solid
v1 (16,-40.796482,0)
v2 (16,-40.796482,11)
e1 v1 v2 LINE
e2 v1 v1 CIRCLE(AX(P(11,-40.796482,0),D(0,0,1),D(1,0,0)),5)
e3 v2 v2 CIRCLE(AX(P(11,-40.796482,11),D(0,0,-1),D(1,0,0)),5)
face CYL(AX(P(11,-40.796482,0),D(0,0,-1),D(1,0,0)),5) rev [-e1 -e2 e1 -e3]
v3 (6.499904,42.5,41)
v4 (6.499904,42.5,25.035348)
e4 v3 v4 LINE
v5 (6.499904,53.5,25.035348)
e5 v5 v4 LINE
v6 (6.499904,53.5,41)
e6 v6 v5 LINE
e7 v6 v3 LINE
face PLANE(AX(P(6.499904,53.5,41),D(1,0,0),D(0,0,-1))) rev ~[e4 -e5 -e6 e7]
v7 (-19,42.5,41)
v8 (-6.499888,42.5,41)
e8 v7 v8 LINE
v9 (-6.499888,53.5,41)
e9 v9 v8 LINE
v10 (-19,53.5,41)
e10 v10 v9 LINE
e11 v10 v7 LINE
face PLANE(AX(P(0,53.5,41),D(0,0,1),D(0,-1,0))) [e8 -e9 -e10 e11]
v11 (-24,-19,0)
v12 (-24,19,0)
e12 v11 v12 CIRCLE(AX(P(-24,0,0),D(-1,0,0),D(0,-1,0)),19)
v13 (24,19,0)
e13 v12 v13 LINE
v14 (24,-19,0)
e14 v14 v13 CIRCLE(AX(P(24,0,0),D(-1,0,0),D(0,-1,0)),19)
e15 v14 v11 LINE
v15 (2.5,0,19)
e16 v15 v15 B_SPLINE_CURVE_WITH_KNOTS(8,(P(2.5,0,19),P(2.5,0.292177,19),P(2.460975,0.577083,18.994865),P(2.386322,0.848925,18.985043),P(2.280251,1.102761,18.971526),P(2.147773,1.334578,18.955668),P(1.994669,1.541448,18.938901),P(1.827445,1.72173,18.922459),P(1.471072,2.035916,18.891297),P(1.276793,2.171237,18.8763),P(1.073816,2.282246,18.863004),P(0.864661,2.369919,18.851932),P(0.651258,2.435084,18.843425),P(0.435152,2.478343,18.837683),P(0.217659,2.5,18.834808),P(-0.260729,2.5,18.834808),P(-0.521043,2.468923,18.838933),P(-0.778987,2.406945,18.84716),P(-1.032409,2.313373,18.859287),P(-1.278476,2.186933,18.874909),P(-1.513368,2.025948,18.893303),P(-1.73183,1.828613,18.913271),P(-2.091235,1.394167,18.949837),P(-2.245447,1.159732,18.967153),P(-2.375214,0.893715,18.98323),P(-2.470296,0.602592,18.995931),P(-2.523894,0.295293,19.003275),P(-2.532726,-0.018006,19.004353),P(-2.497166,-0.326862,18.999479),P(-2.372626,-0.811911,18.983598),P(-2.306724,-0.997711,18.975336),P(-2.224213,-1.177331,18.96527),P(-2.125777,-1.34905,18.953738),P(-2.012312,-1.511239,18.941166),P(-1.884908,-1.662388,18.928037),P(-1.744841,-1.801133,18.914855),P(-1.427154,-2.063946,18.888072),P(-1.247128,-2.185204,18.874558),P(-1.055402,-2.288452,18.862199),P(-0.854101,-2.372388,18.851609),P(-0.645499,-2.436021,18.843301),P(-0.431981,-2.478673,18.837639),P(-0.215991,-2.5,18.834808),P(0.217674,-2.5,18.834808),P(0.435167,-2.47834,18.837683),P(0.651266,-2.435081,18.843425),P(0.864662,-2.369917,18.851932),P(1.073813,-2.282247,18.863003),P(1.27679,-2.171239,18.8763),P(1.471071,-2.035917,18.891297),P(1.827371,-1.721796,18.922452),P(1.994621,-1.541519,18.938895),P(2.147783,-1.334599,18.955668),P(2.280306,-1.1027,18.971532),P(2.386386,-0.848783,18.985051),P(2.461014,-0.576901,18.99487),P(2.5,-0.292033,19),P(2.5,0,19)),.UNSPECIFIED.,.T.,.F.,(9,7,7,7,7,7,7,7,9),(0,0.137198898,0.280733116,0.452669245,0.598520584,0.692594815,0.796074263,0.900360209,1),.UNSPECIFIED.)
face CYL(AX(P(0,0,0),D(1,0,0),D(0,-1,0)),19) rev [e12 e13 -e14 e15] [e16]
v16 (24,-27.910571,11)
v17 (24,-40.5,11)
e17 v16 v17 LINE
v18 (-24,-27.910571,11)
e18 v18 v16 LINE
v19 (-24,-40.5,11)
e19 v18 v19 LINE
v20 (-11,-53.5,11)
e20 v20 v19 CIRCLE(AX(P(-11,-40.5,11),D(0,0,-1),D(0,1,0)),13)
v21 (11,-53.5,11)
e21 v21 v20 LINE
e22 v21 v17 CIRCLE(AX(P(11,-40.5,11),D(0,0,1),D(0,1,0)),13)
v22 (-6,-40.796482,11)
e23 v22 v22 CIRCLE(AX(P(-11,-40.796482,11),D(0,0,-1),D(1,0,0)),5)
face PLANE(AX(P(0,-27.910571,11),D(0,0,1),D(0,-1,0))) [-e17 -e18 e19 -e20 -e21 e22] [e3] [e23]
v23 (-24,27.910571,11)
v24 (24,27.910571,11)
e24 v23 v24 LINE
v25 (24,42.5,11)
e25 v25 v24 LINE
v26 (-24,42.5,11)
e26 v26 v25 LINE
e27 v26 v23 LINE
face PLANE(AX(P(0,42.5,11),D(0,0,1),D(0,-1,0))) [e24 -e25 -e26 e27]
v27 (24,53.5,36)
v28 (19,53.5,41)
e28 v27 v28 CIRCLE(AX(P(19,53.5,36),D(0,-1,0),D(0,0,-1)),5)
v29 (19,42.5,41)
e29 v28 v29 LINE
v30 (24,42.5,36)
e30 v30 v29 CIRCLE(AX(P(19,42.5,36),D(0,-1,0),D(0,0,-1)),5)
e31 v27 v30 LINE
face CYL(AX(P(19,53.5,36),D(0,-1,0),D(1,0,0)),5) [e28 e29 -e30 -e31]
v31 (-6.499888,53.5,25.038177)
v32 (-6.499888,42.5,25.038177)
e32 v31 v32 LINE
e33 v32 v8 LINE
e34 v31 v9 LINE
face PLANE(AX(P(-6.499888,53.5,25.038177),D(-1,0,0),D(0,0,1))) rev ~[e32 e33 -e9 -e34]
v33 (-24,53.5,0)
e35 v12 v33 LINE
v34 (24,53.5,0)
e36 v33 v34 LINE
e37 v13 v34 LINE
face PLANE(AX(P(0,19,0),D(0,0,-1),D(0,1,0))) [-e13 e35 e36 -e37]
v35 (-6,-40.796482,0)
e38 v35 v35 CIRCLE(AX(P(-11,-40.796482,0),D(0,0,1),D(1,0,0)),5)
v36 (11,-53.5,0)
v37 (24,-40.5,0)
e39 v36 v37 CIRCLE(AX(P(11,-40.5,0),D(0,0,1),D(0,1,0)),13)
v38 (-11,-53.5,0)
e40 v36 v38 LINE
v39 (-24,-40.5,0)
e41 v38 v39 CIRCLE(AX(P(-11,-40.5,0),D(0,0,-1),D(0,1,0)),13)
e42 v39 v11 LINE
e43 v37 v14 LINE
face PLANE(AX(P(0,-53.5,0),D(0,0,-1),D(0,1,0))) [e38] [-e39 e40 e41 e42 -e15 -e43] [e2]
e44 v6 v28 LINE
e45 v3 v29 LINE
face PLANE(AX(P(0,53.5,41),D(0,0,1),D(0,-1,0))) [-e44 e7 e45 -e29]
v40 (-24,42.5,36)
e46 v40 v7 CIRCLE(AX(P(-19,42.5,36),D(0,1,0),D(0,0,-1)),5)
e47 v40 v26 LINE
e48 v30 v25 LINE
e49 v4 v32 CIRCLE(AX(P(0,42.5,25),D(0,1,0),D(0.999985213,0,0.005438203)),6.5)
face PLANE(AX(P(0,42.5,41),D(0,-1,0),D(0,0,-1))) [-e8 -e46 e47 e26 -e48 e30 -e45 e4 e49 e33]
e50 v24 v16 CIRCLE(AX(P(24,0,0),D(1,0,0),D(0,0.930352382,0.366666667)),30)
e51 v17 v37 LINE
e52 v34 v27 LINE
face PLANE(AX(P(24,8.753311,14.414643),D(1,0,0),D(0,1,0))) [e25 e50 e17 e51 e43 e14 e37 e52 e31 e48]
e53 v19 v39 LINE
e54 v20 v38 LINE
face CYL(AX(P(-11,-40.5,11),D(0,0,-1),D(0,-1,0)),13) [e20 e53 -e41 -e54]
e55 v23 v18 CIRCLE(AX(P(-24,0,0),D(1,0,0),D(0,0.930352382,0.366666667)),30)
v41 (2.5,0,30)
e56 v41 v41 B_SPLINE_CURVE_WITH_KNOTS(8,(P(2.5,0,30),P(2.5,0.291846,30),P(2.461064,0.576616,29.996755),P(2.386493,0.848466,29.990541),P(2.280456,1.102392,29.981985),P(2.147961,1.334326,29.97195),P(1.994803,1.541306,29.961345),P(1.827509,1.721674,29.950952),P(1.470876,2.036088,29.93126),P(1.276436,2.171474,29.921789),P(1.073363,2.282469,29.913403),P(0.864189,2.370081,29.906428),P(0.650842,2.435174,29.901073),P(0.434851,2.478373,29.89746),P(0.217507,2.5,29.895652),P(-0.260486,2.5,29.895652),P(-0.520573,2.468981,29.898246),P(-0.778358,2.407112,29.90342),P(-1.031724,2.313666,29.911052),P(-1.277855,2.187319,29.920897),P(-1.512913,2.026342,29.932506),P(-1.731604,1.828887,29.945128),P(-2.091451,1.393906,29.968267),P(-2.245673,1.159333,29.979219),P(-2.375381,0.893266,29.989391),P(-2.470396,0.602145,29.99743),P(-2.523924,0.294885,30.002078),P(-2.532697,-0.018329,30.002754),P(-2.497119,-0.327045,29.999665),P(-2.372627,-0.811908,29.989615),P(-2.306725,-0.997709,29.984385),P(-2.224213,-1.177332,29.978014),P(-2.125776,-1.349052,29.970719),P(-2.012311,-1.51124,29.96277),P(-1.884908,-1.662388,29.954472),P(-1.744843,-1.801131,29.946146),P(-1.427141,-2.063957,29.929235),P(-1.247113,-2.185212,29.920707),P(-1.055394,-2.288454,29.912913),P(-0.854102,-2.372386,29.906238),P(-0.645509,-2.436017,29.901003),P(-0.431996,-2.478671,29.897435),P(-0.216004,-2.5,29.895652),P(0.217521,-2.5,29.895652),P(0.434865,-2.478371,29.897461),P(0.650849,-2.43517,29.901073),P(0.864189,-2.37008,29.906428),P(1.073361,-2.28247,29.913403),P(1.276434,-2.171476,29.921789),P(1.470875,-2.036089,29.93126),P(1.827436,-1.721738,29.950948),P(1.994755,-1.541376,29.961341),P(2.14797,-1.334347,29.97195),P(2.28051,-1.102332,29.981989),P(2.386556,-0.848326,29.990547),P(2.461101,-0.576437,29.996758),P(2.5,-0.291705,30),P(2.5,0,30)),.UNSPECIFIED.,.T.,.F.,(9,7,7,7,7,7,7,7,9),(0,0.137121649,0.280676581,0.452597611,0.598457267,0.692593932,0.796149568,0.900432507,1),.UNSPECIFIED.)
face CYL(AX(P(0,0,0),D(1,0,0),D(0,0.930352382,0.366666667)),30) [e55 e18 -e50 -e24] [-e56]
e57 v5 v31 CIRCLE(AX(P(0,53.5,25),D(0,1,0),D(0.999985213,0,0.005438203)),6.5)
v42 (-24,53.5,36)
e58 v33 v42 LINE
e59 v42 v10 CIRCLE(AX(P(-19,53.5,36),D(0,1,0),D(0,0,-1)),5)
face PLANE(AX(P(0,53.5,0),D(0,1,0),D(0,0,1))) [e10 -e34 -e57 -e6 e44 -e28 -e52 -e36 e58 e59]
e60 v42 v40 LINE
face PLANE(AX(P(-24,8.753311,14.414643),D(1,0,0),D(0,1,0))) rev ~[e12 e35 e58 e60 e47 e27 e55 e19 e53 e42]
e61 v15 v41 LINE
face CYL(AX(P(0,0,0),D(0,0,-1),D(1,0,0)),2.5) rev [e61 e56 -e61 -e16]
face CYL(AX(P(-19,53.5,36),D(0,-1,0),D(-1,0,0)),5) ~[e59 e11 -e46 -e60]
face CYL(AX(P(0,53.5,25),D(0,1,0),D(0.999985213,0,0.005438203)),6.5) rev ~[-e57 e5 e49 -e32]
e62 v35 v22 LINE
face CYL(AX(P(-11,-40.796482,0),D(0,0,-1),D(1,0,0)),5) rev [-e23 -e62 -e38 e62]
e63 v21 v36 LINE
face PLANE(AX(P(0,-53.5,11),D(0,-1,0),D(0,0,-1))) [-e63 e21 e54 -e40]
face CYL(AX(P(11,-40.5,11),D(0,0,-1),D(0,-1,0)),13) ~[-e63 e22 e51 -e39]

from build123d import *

# Parameters (mm, degrees)
F1_DEPTH = 24
F3_R     = 13
F4_R     = 5
F6_DEPTH = 11
F5_R     = 5
F5_R_2   = 2.5
F7_DEPTH = 41.001


# Not quite as in the source:
# - a feature names something its author has since deleted; it is built from what else it names


with BuildPart() as f1:
    # F0 (on Right) → F1 (new body, symmetric)
    with BuildSketch(Plane.YZ):
        with BuildLine():
            ThreePointArc((-19, 0), (0, 19), (19, 0))
            Line((19, 0), (53.5, 0))
            Line((53.5, 0), (53.5, 11))
            Line((53.5, 11), (53.5, 41))
            Line((53.5, 41), (42.5, 41))
            Line((42.5, 41), (42.5, 11))
            Line((42.5, 11), (27.9105714739, 11))
            ThreePointArc((27.9105714739, 11), (0, 30), (-27.9105714739, 11))
            Line((-27.9105714739, 11), (-53.5, 11))
            Line((-53.5, 11), (-53.5, 0))
            Line((-53.5, 0), (-19, 0))
        make_face()
    extrude(amount=F1_DEPTH, both=True)

    # F3
    f3_edges = [f1.edges().sort_by_distance(p)[0] for p in [
        (-24, -53.5, 5.5),
        (24, -53.5, 5.5),
    ]]
    fillet(f3_edges, radius=F3_R)

    # F4
    f4_edges = [f1.edges().sort_by_distance(p)[0] for p in [
        (-24, 48, 41),
        (24, 48, 41),
    ]]
    fillet(f4_edges, radius=F4_R)

    # F2 (on face) → F6 (cut, through all)
    with BuildSketch(Plane(origin=(0, 53.5, 0), x_dir=(-1, 0, 0), z_dir=(0, 1, 0))):
        with BuildLine():
            Line((-6.4999038836, 41), (-6.4999038836, 25.03534832))
            ThreePointArc((-6.4999038836, 25.03534832), (0.0014145677, 18.5000001539), (6.4998878825, 25.0381774101))
            Line((6.4998878825, 25.0381774101), (6.4998878825, 41))
            Line((6.4998878825, 41), (-6.4999038836, 41))
        make_face()
    extrude(amount=-F6_DEPTH, mode=Mode.SUBTRACT)

    # F5 (on Top) → F7 (cut, through all)
    with BuildSketch(Plane.XY):
        with Locations((-11, -40.7964820042)):
            Circle(F5_R)
        with Locations((11, -40.7964820042)):
            Circle(F5_R)
        Circle(F5_R_2)
    extrude(amount=F7_DEPTH, mode=Mode.SUBTRACT)


solid = f1.part
